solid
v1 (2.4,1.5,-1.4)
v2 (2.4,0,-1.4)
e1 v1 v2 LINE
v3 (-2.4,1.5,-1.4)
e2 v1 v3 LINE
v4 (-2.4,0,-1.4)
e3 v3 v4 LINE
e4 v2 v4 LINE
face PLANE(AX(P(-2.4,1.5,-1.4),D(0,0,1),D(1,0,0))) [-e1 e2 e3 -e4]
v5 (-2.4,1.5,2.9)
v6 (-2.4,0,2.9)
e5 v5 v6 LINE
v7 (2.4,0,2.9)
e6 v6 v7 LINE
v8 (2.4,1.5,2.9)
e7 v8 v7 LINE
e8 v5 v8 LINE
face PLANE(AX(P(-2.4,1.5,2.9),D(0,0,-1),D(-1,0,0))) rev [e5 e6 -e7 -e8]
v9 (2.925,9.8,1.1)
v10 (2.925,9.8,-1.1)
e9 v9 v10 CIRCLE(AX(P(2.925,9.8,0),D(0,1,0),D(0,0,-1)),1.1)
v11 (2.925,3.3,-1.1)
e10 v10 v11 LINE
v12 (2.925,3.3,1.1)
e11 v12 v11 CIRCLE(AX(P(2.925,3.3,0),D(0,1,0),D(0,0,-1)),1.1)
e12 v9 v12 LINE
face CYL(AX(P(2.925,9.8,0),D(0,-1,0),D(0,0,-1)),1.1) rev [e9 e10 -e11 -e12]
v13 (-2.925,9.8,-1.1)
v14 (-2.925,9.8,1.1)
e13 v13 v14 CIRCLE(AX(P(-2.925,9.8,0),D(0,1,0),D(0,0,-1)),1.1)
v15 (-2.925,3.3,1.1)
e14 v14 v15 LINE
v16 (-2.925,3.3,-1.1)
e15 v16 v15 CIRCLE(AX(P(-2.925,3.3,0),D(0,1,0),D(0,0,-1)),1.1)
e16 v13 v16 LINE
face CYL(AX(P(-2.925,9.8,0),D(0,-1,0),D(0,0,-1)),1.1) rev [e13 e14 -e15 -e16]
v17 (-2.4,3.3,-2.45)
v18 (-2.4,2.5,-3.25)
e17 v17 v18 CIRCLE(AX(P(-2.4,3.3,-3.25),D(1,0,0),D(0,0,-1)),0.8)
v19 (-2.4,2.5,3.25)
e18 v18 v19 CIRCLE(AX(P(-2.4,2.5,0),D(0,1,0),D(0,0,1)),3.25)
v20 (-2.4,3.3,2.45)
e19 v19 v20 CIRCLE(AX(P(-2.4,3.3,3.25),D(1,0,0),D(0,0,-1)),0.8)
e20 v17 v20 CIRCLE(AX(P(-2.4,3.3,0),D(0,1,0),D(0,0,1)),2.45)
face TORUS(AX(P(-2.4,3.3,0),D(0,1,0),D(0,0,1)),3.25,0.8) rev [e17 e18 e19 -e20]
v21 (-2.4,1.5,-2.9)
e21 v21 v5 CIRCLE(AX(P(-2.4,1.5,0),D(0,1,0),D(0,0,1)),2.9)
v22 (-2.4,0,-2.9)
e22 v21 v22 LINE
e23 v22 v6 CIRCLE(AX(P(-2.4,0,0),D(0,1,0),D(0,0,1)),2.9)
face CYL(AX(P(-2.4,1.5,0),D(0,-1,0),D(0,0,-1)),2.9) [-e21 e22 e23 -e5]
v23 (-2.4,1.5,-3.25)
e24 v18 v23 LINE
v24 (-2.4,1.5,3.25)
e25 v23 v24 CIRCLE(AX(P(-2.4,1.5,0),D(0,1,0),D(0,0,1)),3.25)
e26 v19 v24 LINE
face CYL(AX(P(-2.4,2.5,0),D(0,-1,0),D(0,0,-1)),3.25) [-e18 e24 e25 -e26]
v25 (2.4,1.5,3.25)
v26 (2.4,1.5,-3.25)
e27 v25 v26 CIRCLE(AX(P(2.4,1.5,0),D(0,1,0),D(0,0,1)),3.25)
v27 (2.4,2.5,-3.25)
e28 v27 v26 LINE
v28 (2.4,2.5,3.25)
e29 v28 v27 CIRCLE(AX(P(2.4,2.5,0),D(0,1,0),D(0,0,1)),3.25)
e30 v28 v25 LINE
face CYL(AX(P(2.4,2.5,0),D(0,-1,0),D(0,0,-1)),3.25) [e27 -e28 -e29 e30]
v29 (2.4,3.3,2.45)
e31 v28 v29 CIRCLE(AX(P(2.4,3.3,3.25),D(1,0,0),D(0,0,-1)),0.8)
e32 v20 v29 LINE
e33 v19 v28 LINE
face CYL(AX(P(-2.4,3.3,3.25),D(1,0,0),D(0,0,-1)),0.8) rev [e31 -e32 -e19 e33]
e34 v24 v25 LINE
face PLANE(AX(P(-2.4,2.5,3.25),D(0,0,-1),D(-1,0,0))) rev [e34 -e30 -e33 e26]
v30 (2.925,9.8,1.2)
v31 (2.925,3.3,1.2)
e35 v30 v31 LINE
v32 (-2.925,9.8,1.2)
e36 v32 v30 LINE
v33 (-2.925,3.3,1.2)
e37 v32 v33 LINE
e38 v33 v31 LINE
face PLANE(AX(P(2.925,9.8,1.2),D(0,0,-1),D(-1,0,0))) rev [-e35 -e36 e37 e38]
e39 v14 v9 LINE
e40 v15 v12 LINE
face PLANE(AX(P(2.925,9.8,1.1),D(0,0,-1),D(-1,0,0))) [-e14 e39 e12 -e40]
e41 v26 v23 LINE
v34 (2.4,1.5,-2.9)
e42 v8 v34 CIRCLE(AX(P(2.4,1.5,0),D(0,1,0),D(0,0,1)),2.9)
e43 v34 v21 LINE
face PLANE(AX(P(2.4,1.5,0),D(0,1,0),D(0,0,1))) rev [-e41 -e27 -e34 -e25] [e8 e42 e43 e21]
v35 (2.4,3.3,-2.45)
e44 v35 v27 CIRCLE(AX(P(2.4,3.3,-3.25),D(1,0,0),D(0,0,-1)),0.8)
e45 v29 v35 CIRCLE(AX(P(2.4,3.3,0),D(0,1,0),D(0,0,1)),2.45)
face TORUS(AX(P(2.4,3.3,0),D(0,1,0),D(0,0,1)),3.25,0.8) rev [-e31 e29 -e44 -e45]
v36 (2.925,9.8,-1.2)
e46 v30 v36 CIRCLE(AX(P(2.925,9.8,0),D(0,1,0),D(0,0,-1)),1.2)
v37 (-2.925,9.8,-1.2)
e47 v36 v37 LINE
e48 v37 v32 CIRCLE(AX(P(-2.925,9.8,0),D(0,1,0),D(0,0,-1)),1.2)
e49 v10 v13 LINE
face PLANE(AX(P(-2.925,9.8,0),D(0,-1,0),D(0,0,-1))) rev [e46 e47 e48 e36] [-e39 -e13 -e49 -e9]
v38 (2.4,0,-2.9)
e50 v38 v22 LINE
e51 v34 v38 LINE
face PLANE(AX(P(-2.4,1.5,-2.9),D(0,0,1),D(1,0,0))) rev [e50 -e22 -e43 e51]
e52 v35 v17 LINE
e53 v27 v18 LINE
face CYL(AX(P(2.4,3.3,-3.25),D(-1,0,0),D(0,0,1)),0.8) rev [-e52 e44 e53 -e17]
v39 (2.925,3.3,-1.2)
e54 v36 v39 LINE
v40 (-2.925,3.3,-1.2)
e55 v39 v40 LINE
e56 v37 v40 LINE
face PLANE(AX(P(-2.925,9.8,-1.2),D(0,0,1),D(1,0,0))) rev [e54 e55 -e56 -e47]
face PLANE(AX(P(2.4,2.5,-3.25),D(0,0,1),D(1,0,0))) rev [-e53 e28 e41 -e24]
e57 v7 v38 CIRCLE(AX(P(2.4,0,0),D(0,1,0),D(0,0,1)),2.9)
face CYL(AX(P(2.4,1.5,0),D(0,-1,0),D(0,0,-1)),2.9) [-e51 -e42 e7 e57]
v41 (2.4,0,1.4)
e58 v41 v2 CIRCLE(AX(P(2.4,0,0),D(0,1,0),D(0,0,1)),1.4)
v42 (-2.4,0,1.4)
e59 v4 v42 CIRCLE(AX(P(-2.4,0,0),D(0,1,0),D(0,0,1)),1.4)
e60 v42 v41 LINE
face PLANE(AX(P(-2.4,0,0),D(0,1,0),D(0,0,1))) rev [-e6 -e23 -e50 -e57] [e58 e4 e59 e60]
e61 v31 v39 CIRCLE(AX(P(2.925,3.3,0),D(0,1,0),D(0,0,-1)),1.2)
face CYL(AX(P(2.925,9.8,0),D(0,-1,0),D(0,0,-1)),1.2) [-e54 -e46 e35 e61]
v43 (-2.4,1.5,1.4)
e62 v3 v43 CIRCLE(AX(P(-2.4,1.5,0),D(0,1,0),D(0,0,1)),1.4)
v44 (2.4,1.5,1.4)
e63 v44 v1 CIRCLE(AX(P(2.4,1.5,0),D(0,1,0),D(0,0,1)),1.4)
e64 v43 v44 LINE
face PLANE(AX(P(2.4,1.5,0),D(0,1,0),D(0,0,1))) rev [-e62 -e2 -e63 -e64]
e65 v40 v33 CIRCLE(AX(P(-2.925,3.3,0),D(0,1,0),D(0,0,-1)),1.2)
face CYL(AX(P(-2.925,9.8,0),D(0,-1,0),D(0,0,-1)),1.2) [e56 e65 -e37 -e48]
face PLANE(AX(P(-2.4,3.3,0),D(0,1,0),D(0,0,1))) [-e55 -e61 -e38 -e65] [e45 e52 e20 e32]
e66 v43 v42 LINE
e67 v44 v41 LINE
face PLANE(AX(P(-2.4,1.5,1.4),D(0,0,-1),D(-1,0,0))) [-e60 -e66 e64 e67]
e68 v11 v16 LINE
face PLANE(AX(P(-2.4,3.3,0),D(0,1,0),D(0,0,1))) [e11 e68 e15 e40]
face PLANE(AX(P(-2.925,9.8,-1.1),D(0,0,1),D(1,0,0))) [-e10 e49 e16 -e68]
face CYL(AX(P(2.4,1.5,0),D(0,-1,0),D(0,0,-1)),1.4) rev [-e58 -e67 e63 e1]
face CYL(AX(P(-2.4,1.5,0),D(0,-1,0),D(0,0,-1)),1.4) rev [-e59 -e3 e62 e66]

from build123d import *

# Parameters (mm, degrees)
BOSS_EXTRUDE1_DEPTH = 1.5
BOSS_EXTRUDE2_DEPTH = 1
BOSS_EXTRUDE4_DEPTH = 0.8
BOSS_EXTRUDE3_DEPTH = 6.5
FILLET1_R           = 0.8


with BuildPart() as part:
    # Sketch1 → Boss-Extrude1 (new body)
    with BuildSketch(Plane(origin=(0, 0, 0), x_dir=(1, 0, 0), z_dir=(0, 1, 0))):
        with BuildLine():
            Line((-2.4, 2.9), (2.4, 2.9))
            ThreePointArc((2.4, 2.9), (5.3, 0), (2.4, -2.9))
            Line((2.4, -2.9), (-2.4, -2.9))
            ThreePointArc((-2.4, -2.9), (-5.3, 0), (-2.4, 2.9))
        make_face()
        with BuildLine():
            Line((-2.4, 1.4), (2.4, 1.4))
            ThreePointArc((2.4, 1.4), (3.8, 0), (2.4, -1.4))
            Line((2.4, -1.4), (-2.4, -1.4))
            ThreePointArc((-2.4, -1.4), (-3.8, 0), (-2.4, 1.4))
        make_face(mode=Mode.SUBTRACT)
    extrude(amount=BOSS_EXTRUDE1_DEPTH)

    # Sketch2 → Boss-Extrude2 (add)
    with BuildSketch(Plane(origin=(0, 1.5, 0), x_dir=(1, 0, 0), z_dir=(0, 1, 0))):
        with BuildLine():
            Line((-2.4, -3.25), (2.4, -3.25))
            ThreePointArc((2.4, -3.25), (5.65, 0), (2.4, 3.25))
            Line((2.4, 3.25), (-2.4, 3.25))
            ThreePointArc((-2.4, 3.25), (-5.65, 0), (-2.4, -3.25))
        make_face()
    extrude(amount=BOSS_EXTRUDE2_DEPTH)

    # Sketch4 → Boss-Extrude4 (add)
    with BuildSketch(Plane(origin=(0, 2.5, 0), x_dir=(1, 0, 0), z_dir=(0, 1, 0))):
        with BuildLine():
            Line((-2.4, -2.45), (2.4, -2.45))
            ThreePointArc((2.4, -2.45), (4.85, 0), (2.4, 2.45))
            Line((2.4, 2.45), (-2.4, 2.45))
            ThreePointArc((-2.4, 2.45), (-4.85, 0), (-2.4, -2.45))
        make_face()
    extrude(amount=BOSS_EXTRUDE4_DEPTH)

    # Sketch3 → Boss-Extrude3 (add)
    with BuildSketch(Plane(origin=(0, 3.3, 0), x_dir=(1, 0, 0), z_dir=(0, 1, 0))):
        with BuildLine():
            Line((-2.925, 1.2), (2.925, 1.2))
            ThreePointArc((2.925, 1.2), (4.125, 0), (2.925, -1.2))
            Line((2.925, -1.2), (-2.925, -1.2))
            ThreePointArc((-2.925, -1.2), (-4.125, 0), (-2.925, 1.2))
        make_face()
        with BuildLine():
            Line((-2.925, 1.1), (2.925, 1.1))
            ThreePointArc((2.925, 1.1), (4.025, 0), (2.925, -1.1))
            Line((2.925, -1.1), (-2.925, -1.1))
            ThreePointArc((-2.925, -1.1), (-4.025, 0), (-2.925, 1.1))
        make_face(mode=Mode.SUBTRACT)
    extrude(amount=BOSS_EXTRUDE3_DEPTH)

    # Fillet1
    fillet1_edges = [part.edges().sort_by_distance(p)[0] for p in [
        (-4.85, 2.5, 0),
        (0, 2.5, -2.45),
        (4.85, 2.5, 0),
        (0, 2.5, 2.45),
    ]]
    fillet(fillet1_edges, radius=FILLET1_R - 0.0001)  # a hair under: the kernel refuses the full size


solid = part.part
